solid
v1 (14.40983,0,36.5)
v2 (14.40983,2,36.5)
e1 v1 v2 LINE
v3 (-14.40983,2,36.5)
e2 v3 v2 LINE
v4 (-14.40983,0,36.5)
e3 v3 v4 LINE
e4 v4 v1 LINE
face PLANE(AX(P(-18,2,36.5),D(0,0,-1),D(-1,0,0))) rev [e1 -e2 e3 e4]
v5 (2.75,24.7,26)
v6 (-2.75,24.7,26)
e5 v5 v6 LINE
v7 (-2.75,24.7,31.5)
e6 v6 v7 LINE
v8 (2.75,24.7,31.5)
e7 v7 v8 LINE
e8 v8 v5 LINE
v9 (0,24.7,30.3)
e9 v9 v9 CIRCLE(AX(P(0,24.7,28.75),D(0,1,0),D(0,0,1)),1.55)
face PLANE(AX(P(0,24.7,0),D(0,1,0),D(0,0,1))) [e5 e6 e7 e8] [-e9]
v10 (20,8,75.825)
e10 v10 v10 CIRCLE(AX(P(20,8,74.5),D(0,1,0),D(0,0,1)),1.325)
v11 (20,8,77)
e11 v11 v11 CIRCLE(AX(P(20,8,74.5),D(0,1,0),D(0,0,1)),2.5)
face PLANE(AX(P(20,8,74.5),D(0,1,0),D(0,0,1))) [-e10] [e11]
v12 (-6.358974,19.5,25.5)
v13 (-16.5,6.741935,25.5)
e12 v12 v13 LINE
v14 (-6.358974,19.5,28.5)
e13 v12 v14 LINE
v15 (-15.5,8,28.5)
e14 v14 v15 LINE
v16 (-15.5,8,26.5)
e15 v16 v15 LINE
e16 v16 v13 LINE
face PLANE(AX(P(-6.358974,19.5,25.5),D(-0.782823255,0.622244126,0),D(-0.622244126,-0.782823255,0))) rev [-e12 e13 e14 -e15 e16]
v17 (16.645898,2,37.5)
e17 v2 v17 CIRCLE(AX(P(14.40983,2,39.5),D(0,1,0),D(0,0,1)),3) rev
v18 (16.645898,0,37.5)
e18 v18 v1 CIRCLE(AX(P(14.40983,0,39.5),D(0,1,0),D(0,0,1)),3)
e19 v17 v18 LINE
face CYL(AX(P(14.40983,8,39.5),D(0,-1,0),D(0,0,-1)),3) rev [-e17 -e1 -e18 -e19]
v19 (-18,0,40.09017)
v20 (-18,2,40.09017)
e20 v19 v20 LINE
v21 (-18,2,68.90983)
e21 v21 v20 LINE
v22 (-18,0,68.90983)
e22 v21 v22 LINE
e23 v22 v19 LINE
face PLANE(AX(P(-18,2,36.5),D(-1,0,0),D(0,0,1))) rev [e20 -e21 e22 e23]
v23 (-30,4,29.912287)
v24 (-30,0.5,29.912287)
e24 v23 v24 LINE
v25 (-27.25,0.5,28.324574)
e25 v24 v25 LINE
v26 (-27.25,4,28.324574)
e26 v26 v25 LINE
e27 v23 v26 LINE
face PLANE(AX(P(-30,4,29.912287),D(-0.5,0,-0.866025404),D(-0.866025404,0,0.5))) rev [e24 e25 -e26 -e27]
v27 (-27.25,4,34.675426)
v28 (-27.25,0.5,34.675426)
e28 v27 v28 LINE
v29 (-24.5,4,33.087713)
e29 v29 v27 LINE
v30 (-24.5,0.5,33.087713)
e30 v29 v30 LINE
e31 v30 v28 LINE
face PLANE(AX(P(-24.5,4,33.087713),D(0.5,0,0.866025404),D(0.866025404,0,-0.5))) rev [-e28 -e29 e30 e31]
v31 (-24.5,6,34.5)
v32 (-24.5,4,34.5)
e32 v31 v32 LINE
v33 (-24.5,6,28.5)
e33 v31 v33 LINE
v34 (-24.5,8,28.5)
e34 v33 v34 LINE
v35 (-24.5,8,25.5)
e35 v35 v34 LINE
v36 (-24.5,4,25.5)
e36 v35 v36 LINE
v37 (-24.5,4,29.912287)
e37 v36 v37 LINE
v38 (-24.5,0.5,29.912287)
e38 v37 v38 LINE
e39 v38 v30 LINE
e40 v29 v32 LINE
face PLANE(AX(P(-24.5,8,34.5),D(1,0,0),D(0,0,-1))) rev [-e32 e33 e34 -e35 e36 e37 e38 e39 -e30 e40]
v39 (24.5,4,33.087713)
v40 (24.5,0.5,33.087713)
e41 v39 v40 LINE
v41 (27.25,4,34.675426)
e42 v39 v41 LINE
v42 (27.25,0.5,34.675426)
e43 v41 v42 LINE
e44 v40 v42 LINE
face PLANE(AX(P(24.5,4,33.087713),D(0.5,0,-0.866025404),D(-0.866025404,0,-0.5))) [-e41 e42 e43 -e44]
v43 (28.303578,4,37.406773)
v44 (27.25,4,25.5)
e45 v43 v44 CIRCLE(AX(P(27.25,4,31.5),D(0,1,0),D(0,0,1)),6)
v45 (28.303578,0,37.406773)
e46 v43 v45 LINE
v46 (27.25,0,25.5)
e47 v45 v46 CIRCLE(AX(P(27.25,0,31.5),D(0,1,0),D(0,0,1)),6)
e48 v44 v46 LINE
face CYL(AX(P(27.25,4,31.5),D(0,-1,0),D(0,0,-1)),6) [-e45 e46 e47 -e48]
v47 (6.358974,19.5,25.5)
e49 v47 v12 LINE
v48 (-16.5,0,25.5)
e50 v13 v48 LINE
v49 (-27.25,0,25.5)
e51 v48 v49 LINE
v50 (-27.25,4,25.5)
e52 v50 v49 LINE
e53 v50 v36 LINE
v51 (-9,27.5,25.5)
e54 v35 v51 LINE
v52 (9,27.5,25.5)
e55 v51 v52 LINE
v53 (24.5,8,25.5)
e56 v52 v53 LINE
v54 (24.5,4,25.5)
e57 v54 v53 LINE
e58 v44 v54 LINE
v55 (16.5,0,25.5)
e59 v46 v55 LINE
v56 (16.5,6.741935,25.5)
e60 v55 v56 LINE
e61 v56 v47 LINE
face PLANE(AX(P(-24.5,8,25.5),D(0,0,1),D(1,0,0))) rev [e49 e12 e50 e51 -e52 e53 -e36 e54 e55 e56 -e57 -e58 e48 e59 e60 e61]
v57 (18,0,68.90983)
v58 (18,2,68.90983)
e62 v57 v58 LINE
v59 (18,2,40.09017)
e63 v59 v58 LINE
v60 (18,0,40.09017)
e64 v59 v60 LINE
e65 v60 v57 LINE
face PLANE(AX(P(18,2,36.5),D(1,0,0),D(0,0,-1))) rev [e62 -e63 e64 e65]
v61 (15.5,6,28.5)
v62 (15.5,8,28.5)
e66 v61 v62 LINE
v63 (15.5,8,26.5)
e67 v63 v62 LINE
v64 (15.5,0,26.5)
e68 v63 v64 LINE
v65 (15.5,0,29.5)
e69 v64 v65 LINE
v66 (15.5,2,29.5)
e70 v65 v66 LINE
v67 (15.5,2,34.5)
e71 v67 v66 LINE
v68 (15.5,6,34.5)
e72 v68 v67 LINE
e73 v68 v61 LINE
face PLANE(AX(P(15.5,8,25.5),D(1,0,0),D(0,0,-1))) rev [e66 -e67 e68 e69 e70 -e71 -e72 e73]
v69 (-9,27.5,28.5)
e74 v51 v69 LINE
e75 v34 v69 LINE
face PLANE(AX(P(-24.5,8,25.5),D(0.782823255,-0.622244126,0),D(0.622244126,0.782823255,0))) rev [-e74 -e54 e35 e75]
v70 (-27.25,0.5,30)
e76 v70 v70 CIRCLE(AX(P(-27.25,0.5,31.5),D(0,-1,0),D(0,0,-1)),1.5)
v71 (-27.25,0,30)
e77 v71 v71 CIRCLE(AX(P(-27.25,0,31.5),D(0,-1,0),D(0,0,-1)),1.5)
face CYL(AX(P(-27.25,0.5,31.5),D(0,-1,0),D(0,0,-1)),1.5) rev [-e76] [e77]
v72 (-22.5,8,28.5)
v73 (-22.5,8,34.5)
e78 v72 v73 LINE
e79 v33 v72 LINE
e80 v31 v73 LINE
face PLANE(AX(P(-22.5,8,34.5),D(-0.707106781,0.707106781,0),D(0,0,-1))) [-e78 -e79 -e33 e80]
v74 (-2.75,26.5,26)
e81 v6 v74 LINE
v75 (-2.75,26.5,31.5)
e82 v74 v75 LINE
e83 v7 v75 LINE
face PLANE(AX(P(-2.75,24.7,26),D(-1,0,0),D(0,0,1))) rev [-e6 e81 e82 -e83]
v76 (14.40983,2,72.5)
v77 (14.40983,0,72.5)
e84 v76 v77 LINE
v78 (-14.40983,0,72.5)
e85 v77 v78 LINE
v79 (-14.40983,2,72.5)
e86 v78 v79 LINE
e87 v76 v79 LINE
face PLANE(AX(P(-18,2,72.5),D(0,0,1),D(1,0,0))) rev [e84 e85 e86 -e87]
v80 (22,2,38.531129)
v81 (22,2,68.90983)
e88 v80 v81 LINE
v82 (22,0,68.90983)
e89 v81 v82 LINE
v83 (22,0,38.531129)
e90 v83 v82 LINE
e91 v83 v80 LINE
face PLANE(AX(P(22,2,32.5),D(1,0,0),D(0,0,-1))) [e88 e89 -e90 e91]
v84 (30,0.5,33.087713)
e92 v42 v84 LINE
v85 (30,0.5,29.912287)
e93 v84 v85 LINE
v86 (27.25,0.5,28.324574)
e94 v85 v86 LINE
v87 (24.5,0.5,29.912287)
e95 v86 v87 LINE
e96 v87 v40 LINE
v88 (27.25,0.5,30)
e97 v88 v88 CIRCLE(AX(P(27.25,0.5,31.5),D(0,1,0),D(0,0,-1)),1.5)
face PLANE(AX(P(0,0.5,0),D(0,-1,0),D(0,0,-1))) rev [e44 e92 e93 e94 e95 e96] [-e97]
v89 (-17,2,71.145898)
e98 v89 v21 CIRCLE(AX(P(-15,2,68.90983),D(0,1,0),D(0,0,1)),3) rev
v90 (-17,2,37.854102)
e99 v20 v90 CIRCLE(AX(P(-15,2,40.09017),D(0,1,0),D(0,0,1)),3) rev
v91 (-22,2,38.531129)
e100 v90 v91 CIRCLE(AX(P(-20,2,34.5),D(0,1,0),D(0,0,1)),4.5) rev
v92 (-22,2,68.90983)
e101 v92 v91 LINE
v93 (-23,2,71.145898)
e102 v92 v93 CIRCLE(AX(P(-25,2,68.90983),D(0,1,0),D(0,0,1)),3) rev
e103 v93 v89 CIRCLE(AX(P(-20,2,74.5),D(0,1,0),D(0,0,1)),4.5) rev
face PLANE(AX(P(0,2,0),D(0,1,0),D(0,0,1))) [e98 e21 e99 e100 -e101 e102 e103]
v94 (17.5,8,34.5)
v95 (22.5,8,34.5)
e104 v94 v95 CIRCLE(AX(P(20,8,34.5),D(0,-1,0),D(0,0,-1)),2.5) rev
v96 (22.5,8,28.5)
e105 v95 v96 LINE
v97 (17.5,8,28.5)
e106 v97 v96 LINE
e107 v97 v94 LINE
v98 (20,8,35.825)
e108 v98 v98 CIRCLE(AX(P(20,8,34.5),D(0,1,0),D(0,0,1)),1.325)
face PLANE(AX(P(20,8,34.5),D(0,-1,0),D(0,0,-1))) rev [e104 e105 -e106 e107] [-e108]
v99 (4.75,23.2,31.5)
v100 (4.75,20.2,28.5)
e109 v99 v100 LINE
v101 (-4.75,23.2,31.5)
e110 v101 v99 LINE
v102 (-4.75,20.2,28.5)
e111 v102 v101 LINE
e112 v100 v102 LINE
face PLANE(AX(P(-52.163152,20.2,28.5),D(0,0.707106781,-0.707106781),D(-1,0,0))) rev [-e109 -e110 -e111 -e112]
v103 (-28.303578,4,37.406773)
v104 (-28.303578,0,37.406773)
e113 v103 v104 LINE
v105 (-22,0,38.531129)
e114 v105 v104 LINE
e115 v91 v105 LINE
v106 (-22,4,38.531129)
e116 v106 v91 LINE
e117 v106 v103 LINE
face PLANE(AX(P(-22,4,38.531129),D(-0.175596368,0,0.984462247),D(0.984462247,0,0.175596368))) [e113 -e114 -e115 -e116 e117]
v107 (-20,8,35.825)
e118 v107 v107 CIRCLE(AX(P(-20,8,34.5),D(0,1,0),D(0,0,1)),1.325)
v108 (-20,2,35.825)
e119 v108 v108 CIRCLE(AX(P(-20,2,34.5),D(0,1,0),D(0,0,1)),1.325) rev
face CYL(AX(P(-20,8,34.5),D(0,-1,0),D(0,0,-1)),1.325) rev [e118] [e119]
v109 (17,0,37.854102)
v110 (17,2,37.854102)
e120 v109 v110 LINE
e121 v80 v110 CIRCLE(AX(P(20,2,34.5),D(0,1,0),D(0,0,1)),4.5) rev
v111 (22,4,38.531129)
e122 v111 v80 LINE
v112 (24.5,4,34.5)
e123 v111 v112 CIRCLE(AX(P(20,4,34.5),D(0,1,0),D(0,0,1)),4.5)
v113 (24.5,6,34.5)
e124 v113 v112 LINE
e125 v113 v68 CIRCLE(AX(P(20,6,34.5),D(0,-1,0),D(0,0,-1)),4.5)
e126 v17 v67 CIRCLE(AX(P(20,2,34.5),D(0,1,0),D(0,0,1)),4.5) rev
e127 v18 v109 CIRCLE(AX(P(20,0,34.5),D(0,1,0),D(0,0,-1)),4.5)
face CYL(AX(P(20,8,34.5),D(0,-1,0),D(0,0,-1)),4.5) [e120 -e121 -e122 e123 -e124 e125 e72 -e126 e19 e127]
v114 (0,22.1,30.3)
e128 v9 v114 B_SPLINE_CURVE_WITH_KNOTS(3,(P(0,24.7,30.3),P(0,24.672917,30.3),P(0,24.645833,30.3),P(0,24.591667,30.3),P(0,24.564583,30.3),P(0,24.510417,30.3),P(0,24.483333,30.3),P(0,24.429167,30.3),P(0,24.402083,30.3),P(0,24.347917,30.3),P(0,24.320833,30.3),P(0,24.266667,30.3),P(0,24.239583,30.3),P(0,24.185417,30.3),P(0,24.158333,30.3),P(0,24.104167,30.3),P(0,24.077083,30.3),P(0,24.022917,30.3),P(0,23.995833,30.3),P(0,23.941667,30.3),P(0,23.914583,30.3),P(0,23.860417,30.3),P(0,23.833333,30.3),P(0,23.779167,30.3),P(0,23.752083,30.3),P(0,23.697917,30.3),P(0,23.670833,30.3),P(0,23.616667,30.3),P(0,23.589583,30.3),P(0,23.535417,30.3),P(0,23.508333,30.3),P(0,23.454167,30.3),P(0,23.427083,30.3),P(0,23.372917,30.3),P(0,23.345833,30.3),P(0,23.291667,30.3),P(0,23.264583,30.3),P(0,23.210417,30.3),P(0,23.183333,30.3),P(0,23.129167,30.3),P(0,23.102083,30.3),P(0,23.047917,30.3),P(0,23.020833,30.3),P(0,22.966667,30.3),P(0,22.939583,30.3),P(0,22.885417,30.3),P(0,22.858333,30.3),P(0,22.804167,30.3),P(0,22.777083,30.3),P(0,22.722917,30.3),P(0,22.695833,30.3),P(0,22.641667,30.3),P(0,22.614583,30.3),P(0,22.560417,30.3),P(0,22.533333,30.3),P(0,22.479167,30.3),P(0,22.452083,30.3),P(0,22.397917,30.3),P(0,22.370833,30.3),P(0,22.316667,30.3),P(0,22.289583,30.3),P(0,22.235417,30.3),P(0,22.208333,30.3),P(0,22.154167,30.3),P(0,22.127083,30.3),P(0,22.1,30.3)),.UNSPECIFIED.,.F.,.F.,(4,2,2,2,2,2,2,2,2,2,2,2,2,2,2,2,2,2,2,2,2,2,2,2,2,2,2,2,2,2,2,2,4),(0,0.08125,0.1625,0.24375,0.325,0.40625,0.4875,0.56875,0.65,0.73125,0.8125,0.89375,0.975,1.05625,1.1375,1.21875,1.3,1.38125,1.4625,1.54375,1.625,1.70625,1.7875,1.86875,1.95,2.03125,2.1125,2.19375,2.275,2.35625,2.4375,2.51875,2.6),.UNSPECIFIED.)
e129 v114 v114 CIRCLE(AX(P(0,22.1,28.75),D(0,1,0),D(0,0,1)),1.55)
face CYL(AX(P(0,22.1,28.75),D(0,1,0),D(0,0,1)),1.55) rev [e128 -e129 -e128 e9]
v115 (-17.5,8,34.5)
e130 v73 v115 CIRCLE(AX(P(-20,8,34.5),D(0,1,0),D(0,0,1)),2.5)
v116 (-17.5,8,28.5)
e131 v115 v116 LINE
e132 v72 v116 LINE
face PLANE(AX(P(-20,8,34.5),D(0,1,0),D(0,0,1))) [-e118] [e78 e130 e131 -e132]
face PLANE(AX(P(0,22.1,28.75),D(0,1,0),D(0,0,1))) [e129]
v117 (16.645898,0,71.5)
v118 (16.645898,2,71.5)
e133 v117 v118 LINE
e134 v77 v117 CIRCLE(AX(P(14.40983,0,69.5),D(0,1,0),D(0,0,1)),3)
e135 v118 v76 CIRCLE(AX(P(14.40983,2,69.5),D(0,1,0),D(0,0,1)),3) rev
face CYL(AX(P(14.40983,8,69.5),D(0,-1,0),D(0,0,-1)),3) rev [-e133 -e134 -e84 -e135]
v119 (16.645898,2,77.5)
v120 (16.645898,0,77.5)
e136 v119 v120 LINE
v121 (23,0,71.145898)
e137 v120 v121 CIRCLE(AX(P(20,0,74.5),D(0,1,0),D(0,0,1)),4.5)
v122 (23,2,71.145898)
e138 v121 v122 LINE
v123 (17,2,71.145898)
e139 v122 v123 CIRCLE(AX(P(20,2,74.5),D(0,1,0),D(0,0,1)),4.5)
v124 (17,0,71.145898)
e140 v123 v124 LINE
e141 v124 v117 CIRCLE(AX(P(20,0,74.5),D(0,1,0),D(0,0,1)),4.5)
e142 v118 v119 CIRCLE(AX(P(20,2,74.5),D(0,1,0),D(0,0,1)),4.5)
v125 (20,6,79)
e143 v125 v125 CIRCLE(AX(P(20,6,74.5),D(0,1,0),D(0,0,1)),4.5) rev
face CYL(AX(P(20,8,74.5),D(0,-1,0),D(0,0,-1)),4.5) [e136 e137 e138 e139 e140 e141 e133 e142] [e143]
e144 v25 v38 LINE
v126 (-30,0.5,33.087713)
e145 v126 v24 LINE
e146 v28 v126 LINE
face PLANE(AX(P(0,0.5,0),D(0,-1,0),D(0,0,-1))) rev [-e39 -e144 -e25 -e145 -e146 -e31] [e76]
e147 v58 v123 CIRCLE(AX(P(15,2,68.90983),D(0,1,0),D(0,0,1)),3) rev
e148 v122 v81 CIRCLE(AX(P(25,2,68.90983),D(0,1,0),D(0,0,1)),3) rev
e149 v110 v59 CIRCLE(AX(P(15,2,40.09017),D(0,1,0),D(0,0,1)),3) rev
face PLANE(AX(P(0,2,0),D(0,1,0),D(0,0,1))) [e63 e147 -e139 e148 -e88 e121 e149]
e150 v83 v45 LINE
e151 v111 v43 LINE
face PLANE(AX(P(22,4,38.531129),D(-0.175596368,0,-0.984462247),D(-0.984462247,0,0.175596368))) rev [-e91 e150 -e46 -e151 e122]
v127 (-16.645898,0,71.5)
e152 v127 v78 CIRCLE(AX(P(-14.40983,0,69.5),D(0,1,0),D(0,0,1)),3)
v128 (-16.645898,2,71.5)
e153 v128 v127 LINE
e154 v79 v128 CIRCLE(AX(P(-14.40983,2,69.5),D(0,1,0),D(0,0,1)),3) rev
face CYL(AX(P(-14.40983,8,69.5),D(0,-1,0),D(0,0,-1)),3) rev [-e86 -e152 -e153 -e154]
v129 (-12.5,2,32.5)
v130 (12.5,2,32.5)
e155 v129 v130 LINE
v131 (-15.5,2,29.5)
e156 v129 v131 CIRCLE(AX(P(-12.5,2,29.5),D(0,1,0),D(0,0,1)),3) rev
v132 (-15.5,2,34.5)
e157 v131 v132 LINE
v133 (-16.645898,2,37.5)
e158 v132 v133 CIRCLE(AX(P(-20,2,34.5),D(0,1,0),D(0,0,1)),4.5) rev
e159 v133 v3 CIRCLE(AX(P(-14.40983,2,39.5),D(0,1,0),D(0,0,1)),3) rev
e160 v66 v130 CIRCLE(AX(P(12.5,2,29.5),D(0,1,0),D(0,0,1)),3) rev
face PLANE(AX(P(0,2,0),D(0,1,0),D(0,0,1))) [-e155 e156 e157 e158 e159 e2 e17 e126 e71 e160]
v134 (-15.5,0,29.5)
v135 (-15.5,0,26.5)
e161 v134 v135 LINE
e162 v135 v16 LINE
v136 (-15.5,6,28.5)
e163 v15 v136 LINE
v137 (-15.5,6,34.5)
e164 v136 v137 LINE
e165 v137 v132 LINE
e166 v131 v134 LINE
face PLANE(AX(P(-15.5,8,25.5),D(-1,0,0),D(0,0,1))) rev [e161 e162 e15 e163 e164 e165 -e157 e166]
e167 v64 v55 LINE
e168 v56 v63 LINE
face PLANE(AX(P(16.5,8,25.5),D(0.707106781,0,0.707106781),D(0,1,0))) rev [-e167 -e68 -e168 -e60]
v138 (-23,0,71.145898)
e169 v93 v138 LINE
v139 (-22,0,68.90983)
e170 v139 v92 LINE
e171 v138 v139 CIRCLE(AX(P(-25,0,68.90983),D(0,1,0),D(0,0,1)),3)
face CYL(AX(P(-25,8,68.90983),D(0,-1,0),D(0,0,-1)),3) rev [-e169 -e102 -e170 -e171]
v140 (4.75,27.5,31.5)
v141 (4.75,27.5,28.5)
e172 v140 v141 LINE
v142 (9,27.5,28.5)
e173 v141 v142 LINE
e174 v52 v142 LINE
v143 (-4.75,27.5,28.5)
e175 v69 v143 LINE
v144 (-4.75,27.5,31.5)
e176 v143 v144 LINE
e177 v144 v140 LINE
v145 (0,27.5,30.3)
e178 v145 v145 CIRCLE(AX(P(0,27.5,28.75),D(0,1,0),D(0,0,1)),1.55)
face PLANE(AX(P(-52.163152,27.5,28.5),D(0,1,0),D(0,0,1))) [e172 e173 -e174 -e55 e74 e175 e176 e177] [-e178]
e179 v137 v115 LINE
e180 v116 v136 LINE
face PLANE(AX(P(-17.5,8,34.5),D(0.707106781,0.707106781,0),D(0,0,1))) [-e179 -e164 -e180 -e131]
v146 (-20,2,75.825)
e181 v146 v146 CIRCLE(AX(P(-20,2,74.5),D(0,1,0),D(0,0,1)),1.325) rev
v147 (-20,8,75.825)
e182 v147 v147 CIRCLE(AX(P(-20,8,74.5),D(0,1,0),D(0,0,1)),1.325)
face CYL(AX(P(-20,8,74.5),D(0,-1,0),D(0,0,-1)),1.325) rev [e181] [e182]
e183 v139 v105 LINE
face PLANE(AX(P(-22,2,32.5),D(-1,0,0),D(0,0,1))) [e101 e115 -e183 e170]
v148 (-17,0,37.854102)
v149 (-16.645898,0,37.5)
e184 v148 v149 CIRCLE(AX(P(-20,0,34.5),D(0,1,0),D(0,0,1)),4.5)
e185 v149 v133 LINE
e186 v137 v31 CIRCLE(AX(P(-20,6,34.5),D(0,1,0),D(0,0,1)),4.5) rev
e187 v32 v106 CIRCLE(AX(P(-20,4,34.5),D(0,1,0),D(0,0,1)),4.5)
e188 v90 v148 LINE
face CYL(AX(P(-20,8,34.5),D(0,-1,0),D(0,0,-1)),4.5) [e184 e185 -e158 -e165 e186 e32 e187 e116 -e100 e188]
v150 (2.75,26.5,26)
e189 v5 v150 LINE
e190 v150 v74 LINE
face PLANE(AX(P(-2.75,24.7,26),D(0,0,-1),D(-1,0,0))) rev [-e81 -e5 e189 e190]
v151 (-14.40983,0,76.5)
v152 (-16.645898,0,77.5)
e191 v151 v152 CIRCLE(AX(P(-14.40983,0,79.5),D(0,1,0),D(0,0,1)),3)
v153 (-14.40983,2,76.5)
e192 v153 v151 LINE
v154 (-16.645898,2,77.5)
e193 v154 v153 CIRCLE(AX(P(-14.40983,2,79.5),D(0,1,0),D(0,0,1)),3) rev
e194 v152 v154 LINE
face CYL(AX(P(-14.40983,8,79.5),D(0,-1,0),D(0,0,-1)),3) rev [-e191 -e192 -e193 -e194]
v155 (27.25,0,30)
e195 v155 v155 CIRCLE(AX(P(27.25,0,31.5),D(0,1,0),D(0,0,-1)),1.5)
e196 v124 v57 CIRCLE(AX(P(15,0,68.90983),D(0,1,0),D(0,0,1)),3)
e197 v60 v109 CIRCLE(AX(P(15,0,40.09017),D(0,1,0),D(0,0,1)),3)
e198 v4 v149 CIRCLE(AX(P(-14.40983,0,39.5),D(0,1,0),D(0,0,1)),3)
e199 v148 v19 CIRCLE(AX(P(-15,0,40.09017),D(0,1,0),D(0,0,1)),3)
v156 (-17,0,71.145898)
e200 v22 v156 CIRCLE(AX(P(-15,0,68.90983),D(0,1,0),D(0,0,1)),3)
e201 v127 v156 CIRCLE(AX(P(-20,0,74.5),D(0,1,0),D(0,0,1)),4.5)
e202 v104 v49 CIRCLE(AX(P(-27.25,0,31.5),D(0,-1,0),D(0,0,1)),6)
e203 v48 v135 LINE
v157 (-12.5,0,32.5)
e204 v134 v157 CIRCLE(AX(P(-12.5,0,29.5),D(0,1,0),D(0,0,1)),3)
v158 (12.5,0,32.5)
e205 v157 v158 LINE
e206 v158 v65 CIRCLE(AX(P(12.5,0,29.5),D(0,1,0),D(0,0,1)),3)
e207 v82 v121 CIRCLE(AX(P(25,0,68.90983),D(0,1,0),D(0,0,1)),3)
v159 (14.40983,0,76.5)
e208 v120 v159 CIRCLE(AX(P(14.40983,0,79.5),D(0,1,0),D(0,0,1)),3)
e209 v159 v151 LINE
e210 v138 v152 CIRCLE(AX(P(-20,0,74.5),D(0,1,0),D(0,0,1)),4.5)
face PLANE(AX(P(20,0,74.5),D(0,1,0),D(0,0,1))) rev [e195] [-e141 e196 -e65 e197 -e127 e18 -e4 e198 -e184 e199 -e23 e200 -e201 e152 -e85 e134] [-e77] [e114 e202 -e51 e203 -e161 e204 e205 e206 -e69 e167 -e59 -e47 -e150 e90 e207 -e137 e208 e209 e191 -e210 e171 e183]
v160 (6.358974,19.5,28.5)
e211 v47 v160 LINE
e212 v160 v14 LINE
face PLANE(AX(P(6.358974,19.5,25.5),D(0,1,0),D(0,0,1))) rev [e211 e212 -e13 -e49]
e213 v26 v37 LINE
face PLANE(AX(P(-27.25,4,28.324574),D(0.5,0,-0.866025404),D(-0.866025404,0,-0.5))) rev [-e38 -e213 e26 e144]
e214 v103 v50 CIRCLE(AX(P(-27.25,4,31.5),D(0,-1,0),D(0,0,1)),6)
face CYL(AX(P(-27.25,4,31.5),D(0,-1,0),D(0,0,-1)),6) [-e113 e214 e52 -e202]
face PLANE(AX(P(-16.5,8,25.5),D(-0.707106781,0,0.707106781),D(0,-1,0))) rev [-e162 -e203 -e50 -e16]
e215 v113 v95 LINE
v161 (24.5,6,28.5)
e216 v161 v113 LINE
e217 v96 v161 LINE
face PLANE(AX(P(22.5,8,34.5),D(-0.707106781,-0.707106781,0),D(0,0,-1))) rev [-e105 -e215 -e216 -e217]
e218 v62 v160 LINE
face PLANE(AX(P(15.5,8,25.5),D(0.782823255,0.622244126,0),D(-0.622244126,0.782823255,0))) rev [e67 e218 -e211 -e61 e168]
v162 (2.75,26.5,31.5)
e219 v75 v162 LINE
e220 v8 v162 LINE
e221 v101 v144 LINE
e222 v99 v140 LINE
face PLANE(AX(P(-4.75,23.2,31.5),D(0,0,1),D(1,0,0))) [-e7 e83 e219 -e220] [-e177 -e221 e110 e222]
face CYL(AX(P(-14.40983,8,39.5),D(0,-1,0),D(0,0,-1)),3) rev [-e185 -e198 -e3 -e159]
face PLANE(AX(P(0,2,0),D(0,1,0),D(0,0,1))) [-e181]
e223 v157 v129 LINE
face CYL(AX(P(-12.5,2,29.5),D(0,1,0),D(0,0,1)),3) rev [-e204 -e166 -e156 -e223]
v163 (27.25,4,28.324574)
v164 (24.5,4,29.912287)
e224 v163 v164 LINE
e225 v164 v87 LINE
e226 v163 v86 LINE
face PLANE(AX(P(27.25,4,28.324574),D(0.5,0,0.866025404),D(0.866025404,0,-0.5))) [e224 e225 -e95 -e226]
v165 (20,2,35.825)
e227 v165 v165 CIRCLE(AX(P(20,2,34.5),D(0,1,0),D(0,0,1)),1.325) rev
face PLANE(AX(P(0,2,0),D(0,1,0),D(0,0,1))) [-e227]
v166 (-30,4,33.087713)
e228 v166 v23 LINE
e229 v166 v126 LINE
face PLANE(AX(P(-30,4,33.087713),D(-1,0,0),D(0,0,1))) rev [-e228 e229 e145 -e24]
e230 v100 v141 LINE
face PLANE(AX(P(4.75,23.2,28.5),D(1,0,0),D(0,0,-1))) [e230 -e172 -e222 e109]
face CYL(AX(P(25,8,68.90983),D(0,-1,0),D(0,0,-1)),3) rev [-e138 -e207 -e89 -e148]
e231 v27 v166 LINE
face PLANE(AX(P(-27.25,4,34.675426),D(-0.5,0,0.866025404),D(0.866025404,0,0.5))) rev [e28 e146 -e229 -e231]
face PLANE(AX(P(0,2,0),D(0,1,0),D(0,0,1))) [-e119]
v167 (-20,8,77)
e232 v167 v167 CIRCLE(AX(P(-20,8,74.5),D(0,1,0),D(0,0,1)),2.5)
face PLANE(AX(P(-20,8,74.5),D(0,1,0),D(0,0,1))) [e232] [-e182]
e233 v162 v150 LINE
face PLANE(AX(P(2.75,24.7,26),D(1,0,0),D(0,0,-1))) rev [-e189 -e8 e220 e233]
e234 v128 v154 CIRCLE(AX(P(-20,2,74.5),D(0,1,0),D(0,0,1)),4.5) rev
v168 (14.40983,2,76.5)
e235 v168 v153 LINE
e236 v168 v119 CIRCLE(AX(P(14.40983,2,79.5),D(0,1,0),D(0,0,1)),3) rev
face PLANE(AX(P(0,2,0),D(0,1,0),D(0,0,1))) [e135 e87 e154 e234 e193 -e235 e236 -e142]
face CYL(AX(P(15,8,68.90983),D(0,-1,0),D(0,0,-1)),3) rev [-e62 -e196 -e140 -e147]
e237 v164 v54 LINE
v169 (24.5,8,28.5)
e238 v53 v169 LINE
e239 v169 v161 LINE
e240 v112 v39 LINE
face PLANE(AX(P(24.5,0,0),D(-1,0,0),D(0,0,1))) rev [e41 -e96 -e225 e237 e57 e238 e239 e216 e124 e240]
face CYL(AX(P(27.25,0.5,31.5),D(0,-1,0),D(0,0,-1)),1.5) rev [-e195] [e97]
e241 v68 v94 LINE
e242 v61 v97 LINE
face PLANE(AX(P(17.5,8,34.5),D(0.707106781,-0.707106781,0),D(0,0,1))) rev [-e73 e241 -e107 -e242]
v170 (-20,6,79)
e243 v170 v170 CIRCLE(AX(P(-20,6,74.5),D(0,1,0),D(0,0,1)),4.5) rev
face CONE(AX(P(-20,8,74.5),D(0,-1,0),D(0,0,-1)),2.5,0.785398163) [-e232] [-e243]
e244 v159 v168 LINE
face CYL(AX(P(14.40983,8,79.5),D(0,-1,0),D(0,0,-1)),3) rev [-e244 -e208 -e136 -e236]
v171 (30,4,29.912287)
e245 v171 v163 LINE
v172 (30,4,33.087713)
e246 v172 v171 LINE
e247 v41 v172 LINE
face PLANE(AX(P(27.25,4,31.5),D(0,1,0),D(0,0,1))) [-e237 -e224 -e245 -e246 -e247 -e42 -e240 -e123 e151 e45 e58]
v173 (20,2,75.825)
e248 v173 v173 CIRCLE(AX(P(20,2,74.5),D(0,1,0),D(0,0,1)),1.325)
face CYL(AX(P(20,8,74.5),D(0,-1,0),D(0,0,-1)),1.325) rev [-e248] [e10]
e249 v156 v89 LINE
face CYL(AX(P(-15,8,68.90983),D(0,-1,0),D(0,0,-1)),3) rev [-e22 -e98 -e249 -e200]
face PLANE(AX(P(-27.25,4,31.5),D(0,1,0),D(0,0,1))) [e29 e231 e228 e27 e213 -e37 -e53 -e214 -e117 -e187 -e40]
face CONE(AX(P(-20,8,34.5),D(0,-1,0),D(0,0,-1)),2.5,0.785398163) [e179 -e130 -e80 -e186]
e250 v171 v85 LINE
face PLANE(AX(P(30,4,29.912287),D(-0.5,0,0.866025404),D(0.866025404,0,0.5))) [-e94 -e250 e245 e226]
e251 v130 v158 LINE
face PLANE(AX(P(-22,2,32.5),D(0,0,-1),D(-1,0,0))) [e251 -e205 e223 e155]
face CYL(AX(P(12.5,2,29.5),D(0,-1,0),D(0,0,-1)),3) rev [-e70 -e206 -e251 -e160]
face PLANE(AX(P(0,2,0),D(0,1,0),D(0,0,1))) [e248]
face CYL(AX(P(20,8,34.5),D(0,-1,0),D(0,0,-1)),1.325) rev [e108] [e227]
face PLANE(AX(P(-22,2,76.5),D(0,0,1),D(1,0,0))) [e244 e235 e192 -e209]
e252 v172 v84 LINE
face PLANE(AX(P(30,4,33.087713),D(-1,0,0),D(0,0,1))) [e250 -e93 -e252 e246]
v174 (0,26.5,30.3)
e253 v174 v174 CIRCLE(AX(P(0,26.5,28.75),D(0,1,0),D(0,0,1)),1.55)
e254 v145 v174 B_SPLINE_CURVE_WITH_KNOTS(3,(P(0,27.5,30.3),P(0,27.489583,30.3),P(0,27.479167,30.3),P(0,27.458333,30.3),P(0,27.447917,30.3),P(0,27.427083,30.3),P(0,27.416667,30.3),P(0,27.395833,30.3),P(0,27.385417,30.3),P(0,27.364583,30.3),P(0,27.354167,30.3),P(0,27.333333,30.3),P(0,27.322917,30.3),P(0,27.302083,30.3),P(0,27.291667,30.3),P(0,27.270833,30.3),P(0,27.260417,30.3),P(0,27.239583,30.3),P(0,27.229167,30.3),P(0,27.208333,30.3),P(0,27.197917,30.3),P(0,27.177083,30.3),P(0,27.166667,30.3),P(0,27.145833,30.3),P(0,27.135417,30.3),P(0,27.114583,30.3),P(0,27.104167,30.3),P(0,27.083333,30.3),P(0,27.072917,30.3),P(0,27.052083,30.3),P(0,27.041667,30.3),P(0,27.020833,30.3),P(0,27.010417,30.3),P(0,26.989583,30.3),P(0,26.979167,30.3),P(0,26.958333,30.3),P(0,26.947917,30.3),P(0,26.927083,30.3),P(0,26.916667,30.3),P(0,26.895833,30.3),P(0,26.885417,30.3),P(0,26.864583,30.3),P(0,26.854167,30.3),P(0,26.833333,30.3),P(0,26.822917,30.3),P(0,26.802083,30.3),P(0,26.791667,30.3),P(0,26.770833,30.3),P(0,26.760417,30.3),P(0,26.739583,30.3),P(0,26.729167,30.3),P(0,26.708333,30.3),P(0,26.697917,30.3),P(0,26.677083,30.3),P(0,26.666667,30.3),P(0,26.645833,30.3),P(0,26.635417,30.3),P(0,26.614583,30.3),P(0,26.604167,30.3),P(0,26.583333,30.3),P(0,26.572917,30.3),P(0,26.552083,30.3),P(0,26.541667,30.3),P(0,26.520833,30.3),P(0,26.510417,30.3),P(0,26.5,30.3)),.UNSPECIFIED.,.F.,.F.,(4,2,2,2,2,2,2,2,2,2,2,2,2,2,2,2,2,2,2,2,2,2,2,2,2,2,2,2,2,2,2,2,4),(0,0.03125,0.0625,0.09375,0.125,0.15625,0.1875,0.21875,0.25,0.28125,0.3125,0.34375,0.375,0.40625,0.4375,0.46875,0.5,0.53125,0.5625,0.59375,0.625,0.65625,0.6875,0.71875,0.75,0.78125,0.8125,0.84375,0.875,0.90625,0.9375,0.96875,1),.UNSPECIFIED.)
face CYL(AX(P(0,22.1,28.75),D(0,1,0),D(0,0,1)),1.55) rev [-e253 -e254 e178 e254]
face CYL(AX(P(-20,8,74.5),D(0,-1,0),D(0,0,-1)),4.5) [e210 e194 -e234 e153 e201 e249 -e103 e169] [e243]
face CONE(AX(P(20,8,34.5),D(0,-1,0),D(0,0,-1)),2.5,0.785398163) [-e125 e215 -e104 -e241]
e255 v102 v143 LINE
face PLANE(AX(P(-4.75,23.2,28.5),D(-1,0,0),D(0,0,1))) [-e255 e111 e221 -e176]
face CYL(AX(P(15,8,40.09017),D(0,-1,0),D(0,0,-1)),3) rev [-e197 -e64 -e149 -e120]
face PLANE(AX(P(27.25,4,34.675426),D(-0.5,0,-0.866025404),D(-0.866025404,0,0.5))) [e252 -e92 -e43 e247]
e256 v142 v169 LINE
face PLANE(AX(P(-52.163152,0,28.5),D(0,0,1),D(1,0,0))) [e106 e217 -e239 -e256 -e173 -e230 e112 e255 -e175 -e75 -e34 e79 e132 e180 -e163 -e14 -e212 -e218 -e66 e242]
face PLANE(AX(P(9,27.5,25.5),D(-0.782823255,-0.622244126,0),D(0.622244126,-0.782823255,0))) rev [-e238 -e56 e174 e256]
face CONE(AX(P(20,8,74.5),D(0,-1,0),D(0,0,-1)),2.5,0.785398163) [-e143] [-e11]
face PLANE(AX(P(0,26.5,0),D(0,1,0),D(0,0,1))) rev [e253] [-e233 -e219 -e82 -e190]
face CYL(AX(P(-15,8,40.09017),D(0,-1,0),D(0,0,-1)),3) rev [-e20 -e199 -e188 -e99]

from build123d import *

# Parameters (mm, degrees)
SKETCH1_R             = 4.5
SKETCH1_R_2           = 1.325
BOSS_EXTRUDE1_DEPTH   = 8
BOSS_EXTRUDE1_2_DEPTH = 8
BOSS_EXTRUDE1_3_DEPTH = 8
BOSS_EXTRUDE1_4_DEPTH = 8
BOSS_EXTRUDE2_REACH   = 95.306
SKETCH2_W             = 3
SKETCH2_H             = 27.5
CUT_EXTRUDE1_DEPTH    = 63.503999872
SKETCH4_W             = 44
SKETCH4_H             = 44
SKETCH4_W_2           = 36
SKETCH4_H_2           = 36
BOSS_EXTRUDE3_DEPTH   = 2
SKETCH7_W             = 9.5
SKETCH7_H             = 3
BOSS_EXTRUDE5_DEPTH   = 4.3
CUT_EXTRUDE3_START    = -1
SKETCH8_W             = 5.5
SKETCH8_H             = 5.5
CUT_EXTRUDE3_DEPTH    = 1.8
CHAMFER3_SIZE         = 3
SKETCH9_R             = 1.55
CUT_EXTRUDE4_DEPTH    = 5.4
BOSS_EXTRUDE6_DEPTH   = 4
SKETCH11_R            = 1.5
BOSS_EXTRUDE7_DEPTH   = 0.5
FILLET2_R             = 3
CHAMFER4_SIZE         = 1
CHAMFER5_SIZE         = 2


with BuildPart() as part:
    # Sketch1 → Boss-Extrude1 (new body)
    with BuildSketch(Plane(origin=(0, 0, 0), x_dir=(1, 0, 0), z_dir=(0, 1, 0))):
        with Locations(Location((20, -74.5, 0), (0, 0, 270))):
            Circle(SKETCH1_R)
        with Locations(Location((20, -74.5, 0), (0, 0, 270))):
            Circle(SKETCH1_R_2, mode=Mode.SUBTRACT)
    extrude(amount=BOSS_EXTRUDE1_DEPTH)



with BuildPart() as body_2:
    # Sketch1 → Boss-Extrude1 2 (new body)
    with BuildSketch(Plane(origin=(0, 0, 0), x_dir=(1, 0, 0), z_dir=(0, 1, 0))):
        with Locations(Location((-20, -74.5, 0), (0, 0, 270))):
            Circle(SKETCH1_R)
        with Locations(Location((-20, -74.5, 0), (0, 0, 270))):
            Circle(SKETCH1_R_2, mode=Mode.SUBTRACT)
    extrude(amount=BOSS_EXTRUDE1_2_DEPTH)


with BuildPart() as body_3:
    # Sketch1 → Boss-Extrude1 3 (new body)
    with BuildSketch(Plane(origin=(0, 0, 0), x_dir=(1, 0, 0), z_dir=(0, 1, 0))):
        with BuildLine():
            Line((-24.5, -34.5), (-24.5, -25.5))
            Line((-24.5, -25.5), (-15.5, -25.5))
            Line((-15.5, -25.5), (-15.5, -34.5))
            ThreePointArc((-15.5, -34.5), (-20, -39), (-24.5, -34.5))
        make_face()
        with Locations(Location((-20, -34.5, 0), (0, 0, 270))):
            Circle(SKETCH1_R_2, mode=Mode.SUBTRACT)
    extrude(amount=BOSS_EXTRUDE1_3_DEPTH)

    # Boss-Extrude2: up to this face of the body (flat: up to its plane)
    boss_extrude2_end = Plane(body_3.part.faces().sort_by_distance((-24.5, 4, 30))[0])
    # Sketch2 → Boss-Extrude2 (add, up to the picked face)
    with BuildSketch(Plane(origin=(24.5, 0, 0), x_dir=(0, 0, -1), z_dir=(1, 0, 0)), mode=Mode.PRIVATE) as boss_extrude2_sk1:
        with Locations((-27, 13.75)):
            Rectangle(SKETCH2_W, SKETCH2_H)
    boss_extrude2_tool1 = split(extrude(boss_extrude2_sk1.sketch, amount=-BOSS_EXTRUDE2_REACH, mode=Mode.PRIVATE), bisect_by=boss_extrude2_end, keep=Keep.BOTH, mode=Mode.PRIVATE)


with BuildPart() as body_4:
    # Sketch1 → Boss-Extrude1 4 (new body)
    with BuildSketch(Plane(origin=(0, 0, 0), x_dir=(1, 0, 0), z_dir=(0, 1, 0))):
        with BuildLine():
            Line((24.5, -34.5), (24.5, -25.5))
            Line((24.5, -25.5), (15.5, -25.5))
            Line((15.5, -25.5), (15.5, -34.5))
            ThreePointArc((15.5, -34.5), (20, -39), (24.5, -34.5))
        make_face()
        with Locations(Location((20, -34.5, 0), (0, 0, 270))):
            Circle(SKETCH1_R_2, mode=Mode.SUBTRACT)
    extrude(amount=BOSS_EXTRUDE1_4_DEPTH)


with BuildPart() as body_3_1:
    add(body_3.part)

    add(body_4.part)  # Boss-Extrude2 merges body 4
    add(boss_extrude2_tool1.solids().sort_by(Axis((24.5, 13.75, 27), (-1, 0, 0)))[0])

    # Sketch3 → Cut-Extrude1 (cut, through all)
    with BuildSketch(Plane.XY.offset(28.5)):
        Polygon((-24.5, 8), (-9, 27.5), (-24.5, 27.5), align=None)
        Polygon((9, 27.5), (24.5, 8), (24.5, 27.5), align=None)
        Polygon((-15.5, 8), (-15.5, 0), (15.5, 0), (15.5, 8), (6.358974359, 19.5), (-6.358974359, 19.5), align=None)
    extrude(amount=-CUT_EXTRUDE1_DEPTH, mode=Mode.SUBTRACT)


with BuildPart() as part_1:
    add(part.part)

    add(body_2.part)  # Boss-Extrude3 merges body 2

    add(body_3_1.part)  # Boss-Extrude3 merges body 3
    # Sketch4 → Boss-Extrude3 (add)
    with BuildSketch(Plane.XZ):
        with Locations((0, 54.5)):
            Rectangle(SKETCH4_W, SKETCH4_H)
        with Locations((0, 54.5)):
            Rectangle(SKETCH4_W_2, SKETCH4_H_2, mode=Mode.SUBTRACT)
    extrude(amount=-BOSS_EXTRUDE3_DEPTH)

    # Sketch7 → Boss-Extrude5 (add)
    with BuildSketch(Plane(origin=(0, 27.5, 0), x_dir=(1, 0, 0), z_dir=(0, 1, 0))):
        with Locations((0, -30)):
            Rectangle(SKETCH7_W, SKETCH7_H)
    extrude(amount=-BOSS_EXTRUDE5_DEPTH)

    # Sketch8 → Cut-Extrude3 (cut)
    with BuildSketch(Plane(origin=(0, 27.5, 0), x_dir=(1, 0, 0), z_dir=(0, 1, 0)).offset(CUT_EXTRUDE3_START)):
        with Locations((0, -28.75)):
            Rectangle(SKETCH8_W, SKETCH8_H)
    extrude(amount=-CUT_EXTRUDE3_DEPTH, mode=Mode.SUBTRACT)

    # Chamfer3
    chamfer3_edges = [part_1.edges().sort_by_distance(p)[0] for p in [
        (0, 23.2, 28.5),
    ]]
    chamfer(chamfer3_edges, length=CHAMFER3_SIZE - 0.0001)  # a hair under: the kernel refuses the full size

    # Sketch9 → Cut-Extrude4 (cut)
    with BuildSketch(Plane(origin=(0, 27.5, 0), x_dir=(1, 0, 0), z_dir=(0, 1, 0))):
        with Locations(Location((0, -28.75, 0), (0, 0, 270))):
            Circle(SKETCH9_R)
    extrude(amount=-CUT_EXTRUDE4_DEPTH, mode=Mode.SUBTRACT)

    # Sketch10 → Boss-Extrude6 (add)
    with BuildSketch(Plane.XZ):
        with BuildLine():
            Line((-24.5, 25.5), (-27.25, 25.5))
            ThreePointArc((-27.25, 25.5), (-33.226647927, 30.971152617), (-28.303578206, 37.406773482))
            Line((-28.303578206, 37.406773482), (-22, 38.531128874))
            Line((-22, 38.531128874), (-22, 25.5))
            Line((-22, 25.5), (-24.5, 25.5))
        make_face()
        Polygon((-27.25, 28.324573519), (-24.5, 29.91228676), (-24.5, 33.08771324), (-27.25, 34.675426481), (-30, 33.08771324), (-30, 29.91228676), align=None, mode=Mode.SUBTRACT)
    boss_extrude6 = extrude(amount=-BOSS_EXTRUDE6_DEPTH)

    # Sketch11 → Boss-Extrude7 (add)
    with BuildSketch(Plane.XZ):
        Polygon((-30, 33.08771324), (-30, 29.91228676), (-27.25, 28.324573519), (-24.5, 29.91228676), (-24.5, 33.08771324), (-27.25, 34.675426481), align=None)
        with Locations(Location((-27.25, 31.5, 0), (0, 0, 270))):
            Circle(SKETCH11_R, mode=Mode.SUBTRACT)
    boss_extrude7 = extrude(amount=-BOSS_EXTRUDE7_DEPTH)

    # Mirror1: Boss-Extrude6, Boss-Extrude7 across plane
    add(boss_extrude6.mirror(Plane(origin=(0, 0, 0), x_dir=(0, 0, 1), z_dir=(1, 0, 0))))
    add(boss_extrude7.mirror(Plane(origin=(0, 0, 0), x_dir=(0, 0, 1), z_dir=(1, 0, 0))))

    # Fillet2
    fillet2_edges = [part_1.edges().sort_by_distance(p)[0] for p in [
        (15.968871126, 1, 76.5),
        (-18, 1, 70.468871126),
        (-15.968871126, 1, 76.5),
        (-22, 1, 70.468871126),
        (-15.968871126, 1, 72.5),
        (15.968871126, 1, 36.5),
        (-15.968871126, 1, 36.5),
        (15.5, 1, 32.5),
        (-15.5, 1, 32.5),
        (18, 1, 70.468871126),
        (-18, 1, 38.531128874),
        (22, 1, 70.468871126),
        (18, 1, 38.531128874),
        (15.968871126, 1, 72.5),
    ]]
    fillet(fillet2_edges, radius=FILLET2_R)

    # Chamfer4
    chamfer4_edges = [part_1.edges().sort_by_distance(p)[0] for p in [
        (15.5, 4, 25.5),
        (-15.5, 4, 25.5),
    ]]
    chamfer(chamfer4_edges, length=CHAMFER4_SIZE)

    # Chamfer5
    chamfer5_edges = [part_1.edges().sort_by_distance(p)[0] for p in [
        (20, 8, 70),
        (-20, 8, 70),
        (-24.5, 8, 31.5),
        (-20, 8, 39),
        (-15.5, 8, 31.5),
        (15.5, 8, 31.5),
        (20, 8, 39),
        (24.5, 8, 31.5),
    ]]
    chamfer(chamfer5_edges, length=CHAMFER5_SIZE)


solid = part_1.part
